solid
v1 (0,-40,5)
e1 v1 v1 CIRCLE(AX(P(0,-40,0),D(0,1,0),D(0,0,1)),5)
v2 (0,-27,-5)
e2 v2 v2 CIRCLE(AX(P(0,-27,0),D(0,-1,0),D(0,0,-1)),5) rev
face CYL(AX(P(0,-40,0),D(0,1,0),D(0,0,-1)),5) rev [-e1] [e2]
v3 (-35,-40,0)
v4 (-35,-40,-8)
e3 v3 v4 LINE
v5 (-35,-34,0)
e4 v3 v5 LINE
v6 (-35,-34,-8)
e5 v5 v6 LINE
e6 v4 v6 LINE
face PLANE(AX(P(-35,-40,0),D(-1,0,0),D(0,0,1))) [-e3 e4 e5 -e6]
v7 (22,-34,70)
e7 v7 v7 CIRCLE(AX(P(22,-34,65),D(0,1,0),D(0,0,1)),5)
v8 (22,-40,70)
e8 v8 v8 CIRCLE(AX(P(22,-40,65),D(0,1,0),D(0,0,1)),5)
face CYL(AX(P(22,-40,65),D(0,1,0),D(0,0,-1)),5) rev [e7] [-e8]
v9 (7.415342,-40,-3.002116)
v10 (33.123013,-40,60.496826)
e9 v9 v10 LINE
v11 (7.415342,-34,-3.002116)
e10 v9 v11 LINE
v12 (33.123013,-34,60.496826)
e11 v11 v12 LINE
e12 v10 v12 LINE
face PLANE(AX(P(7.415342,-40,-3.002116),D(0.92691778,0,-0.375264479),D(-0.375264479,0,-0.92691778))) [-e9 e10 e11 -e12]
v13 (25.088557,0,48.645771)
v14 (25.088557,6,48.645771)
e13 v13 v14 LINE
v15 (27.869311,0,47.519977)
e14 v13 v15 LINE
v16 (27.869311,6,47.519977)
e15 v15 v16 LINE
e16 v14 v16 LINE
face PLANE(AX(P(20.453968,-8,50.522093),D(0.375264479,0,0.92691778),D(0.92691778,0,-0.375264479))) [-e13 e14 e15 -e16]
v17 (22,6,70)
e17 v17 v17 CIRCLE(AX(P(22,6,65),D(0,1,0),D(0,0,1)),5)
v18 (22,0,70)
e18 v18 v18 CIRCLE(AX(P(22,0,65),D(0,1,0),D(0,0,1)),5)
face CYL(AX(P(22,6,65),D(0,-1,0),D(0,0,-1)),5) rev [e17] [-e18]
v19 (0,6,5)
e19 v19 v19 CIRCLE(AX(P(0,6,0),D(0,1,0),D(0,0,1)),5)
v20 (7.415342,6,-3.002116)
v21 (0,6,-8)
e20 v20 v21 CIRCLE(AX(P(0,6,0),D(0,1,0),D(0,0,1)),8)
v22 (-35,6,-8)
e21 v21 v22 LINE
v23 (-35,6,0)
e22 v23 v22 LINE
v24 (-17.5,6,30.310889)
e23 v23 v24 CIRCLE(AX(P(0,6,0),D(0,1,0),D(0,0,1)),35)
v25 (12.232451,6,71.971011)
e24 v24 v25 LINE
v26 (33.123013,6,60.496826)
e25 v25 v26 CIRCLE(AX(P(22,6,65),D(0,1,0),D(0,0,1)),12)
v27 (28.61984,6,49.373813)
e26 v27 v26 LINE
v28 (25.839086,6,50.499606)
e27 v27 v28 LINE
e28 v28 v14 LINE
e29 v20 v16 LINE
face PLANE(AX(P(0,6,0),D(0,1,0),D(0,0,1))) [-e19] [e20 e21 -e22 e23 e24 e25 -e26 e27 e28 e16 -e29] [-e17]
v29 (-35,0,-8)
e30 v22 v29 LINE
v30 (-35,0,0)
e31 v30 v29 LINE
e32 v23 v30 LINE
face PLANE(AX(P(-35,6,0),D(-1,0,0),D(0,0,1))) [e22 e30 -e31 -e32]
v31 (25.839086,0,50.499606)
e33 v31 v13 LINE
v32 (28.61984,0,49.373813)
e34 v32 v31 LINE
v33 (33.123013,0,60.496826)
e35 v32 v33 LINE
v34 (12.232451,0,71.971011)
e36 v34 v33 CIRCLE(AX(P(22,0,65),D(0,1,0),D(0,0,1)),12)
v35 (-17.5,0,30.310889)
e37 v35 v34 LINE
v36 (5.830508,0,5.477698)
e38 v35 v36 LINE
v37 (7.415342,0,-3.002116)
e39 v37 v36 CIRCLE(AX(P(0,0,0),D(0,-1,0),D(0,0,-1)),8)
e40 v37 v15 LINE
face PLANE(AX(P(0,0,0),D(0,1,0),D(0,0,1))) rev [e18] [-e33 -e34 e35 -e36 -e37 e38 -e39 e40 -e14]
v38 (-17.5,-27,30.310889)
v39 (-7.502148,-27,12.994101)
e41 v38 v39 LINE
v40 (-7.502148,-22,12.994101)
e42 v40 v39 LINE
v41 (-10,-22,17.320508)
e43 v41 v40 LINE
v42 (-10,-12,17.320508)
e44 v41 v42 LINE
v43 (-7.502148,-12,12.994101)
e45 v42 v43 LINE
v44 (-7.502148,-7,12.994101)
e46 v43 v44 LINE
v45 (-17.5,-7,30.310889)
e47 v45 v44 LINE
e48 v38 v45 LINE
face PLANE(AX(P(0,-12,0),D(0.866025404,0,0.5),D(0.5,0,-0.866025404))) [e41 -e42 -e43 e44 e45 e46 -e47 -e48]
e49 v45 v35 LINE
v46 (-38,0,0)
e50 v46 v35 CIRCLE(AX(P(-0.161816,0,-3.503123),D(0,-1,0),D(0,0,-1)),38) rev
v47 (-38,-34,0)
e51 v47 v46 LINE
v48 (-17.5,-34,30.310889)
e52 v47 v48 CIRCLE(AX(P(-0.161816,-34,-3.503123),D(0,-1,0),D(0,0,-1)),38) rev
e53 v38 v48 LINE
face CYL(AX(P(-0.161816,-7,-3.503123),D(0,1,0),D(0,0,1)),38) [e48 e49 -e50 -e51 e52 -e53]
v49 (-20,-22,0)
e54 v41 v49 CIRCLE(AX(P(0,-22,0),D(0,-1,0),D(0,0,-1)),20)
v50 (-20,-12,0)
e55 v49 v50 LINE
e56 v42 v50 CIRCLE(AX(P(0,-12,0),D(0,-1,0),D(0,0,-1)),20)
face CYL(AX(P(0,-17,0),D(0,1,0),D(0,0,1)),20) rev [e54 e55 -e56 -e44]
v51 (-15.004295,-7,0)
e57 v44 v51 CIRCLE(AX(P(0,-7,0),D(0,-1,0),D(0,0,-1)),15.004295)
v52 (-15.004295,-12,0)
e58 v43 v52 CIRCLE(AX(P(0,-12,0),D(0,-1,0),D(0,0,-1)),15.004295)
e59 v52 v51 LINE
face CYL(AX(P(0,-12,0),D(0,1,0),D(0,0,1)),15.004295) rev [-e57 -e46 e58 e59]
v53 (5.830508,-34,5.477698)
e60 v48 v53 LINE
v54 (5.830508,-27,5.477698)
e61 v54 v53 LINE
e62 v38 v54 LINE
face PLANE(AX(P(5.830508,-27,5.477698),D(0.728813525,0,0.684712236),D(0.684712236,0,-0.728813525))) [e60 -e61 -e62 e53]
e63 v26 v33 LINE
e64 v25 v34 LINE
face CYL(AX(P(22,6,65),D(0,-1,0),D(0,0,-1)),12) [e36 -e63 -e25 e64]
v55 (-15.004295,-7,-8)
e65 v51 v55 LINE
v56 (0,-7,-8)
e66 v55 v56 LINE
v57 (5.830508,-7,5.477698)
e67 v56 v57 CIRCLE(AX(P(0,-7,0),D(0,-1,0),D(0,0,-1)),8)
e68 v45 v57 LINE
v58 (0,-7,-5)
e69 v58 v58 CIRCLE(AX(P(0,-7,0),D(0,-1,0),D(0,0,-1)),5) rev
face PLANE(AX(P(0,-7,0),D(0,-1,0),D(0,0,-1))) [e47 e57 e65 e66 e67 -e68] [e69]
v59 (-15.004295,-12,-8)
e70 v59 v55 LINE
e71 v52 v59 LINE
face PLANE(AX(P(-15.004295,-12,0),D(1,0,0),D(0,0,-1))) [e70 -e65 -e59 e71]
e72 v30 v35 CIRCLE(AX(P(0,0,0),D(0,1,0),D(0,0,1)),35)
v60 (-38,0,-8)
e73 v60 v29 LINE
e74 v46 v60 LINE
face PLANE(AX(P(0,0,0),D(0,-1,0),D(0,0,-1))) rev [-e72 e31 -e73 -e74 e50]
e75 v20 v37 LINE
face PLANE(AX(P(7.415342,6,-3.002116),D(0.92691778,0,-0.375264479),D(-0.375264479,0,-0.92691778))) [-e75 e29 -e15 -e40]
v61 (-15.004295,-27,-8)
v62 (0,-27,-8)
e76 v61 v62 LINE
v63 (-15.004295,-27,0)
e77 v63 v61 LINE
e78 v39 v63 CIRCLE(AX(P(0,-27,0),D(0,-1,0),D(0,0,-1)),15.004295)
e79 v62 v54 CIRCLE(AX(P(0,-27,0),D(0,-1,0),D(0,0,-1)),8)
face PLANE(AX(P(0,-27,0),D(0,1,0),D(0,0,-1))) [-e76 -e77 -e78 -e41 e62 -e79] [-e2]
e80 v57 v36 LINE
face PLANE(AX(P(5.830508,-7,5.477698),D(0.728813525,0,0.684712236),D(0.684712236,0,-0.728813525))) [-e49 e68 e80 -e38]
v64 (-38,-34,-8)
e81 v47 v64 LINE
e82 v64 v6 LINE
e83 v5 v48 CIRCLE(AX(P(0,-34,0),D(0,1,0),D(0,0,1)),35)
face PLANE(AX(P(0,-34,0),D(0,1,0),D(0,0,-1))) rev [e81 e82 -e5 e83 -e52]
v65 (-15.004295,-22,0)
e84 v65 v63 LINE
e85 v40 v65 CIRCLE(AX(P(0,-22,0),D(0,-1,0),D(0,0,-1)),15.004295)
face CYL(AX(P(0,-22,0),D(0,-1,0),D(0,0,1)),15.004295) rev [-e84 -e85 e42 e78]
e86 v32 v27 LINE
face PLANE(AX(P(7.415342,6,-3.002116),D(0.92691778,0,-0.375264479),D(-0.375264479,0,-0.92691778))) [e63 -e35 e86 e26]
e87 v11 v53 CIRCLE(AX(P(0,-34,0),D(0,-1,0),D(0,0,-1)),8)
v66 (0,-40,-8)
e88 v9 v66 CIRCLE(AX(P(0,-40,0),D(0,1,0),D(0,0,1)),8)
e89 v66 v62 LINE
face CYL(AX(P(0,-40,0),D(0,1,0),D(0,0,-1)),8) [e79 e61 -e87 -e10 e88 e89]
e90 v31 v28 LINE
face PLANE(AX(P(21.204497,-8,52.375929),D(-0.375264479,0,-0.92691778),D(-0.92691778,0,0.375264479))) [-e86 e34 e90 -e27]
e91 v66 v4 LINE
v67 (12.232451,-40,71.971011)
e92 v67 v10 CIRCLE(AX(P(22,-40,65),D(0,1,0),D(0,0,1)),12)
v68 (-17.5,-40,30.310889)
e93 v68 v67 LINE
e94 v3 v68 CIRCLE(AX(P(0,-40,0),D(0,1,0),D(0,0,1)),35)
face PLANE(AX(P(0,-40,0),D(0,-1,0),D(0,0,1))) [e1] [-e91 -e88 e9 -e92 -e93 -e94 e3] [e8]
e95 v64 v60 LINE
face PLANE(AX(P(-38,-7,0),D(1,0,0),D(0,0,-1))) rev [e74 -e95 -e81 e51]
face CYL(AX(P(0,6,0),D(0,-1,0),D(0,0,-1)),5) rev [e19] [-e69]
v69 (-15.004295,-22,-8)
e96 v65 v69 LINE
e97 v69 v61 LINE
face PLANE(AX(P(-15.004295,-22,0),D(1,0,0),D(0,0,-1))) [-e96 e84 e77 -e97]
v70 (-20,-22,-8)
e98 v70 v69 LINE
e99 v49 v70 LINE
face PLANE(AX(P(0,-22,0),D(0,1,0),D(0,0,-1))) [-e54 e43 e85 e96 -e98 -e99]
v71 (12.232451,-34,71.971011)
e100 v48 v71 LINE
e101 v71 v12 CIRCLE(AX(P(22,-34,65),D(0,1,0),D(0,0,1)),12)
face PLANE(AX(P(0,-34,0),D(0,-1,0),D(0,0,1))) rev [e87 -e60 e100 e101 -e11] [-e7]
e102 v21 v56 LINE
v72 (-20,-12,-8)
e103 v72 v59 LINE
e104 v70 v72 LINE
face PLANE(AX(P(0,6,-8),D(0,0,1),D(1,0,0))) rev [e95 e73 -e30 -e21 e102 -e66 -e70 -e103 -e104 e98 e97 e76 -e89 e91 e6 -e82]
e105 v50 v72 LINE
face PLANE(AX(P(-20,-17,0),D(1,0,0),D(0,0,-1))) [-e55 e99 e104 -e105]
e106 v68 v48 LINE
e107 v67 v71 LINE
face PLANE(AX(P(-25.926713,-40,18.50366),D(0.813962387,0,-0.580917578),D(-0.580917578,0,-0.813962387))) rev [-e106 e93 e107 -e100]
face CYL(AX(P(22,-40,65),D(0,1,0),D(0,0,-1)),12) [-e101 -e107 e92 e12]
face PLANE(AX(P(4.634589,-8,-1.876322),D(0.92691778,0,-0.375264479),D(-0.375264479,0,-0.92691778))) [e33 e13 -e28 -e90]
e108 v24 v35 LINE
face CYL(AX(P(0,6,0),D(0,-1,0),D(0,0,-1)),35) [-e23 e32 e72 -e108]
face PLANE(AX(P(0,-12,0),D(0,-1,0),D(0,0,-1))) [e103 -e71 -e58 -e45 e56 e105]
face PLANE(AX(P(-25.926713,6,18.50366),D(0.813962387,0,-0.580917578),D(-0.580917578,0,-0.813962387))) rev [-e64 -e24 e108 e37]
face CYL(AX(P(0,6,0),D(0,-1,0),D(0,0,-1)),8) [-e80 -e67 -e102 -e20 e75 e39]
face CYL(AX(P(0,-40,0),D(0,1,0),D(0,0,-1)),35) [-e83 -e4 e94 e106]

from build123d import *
from build123d.topology import SkipClean

# Parameters (mm, degrees)
SKETCH2_R           = 5
BOSS_EXTRUDE1_DEPTH = 6
BOSS_EXTRUDE2_START = 7
SKETCH3_R           = 5
BOSS_EXTRUDE2_DEPTH = 7
BOSS_EXTRUDE3_START = 5
SKETCH4_W           = 22.995704609
SKETCH4_H           = 8
BOSS_EXTRUDE3_DEPTH = 5
BOSS_EXTRUDE4_START = 5
SKETCH5_W           = 18
SKETCH5_H           = 8
BOSS_EXTRUDE4_DEPTH = 5
MIRROR1_START       = -40
MIRROR1_OUTLINE_R   = 5
MIRROR1_DEPTH       = 6
MIRROR1_START_2     = -34
MIRROR1_2_DEPTH     = 17
MIRROR1_3_OUTLINE_R = 5
MIRROR1_3_DEPTH     = 7
MIRROR1_START_3     = -27
MIRROR1_4_DEPTH     = 5
CUT_EXTRUDE1_DEPTH  = 14


# Read off the part's stored shape, not the designer's step: Mirror1
with BuildPart() as part:
    # Sketch2 → Boss-Extrude1 (new body)
    with BuildSketch(Plane(origin=(0, 0, 0), x_dir=(1, 0, 0), z_dir=(0, 1, 0))):
        with BuildLine():
            ThreePointArc((7.415342239, 3.002115835), (4.471189625, 6.633887498), (0, 8))
            Line((0, 8), (-35, 8))
            Line((-35, 8), (-35, 0))
            ThreePointArc((-35, 0), (-30.310889132, -17.5), (-17.5, -30.310889132))
            Line((-17.5, -30.310889132), (12.232451358, -71.97101094))
            ThreePointArc((12.232451358, -71.97101094), (27.776984485, -75.517910927), (33.123013358, -60.496826248))
            Line((33.123013358, -60.496826248), (7.415342239, 3.002115835))
        make_face()
        with Locations(Location((0, 0, 0), (0, 0, 270))):
            Circle(SKETCH2_R, mode=Mode.SUBTRACT)
        with Locations(Location((22, -65, 0), (0, 0, 270))):
            Circle(SKETCH2_R, mode=Mode.SUBTRACT)
    extrude(amount=BOSS_EXTRUDE1_DEPTH)

    # Sketch3 → Boss-Extrude2 (add)
    with SkipClean():  # the faces are left unmerged after this step: merging them gives an invalid solid
        with BuildSketch(Plane.XZ.offset(BOSS_EXTRUDE2_START)):
            with BuildLine():
                Line((5.830508196, 5.47769789), (-17.5, 30.310889132))
                ThreePointArc((-17.5, 30.310889132), (-31.638718646, 17.785480653), (-38, 0))
                Line((-38, 0), (-38, -8))
                Line((-38, -8), (-35, -8))
                Line((-35, -8), (0, -8))
                ThreePointArc((0, -8), (7.342396854, -3.176351435), (5.830508196, 5.47769789))
            make_face()
            with Locations(Location((0, 0, 0), (0, 0, 270))):
                Circle(SKETCH3_R, mode=Mode.SUBTRACT)
        extrude(amount=-BOSS_EXTRUDE2_DEPTH)

    # Sketch4 → Boss-Extrude3 (add)
    with SkipClean():  # the faces are left unmerged after this step: merging them gives an invalid solid
        with BuildSketch(Plane.XZ.offset(7).offset(BOSS_EXTRUDE3_START)):
            with BuildLine():
                Line((-38, 0), (-15.004295391, 0))
                ThreePointArc((-15.004295391, 0), (-12.994100974, 7.502147695), (-7.502147695, 12.994100974))
                Line((-7.502147695, 12.994100974), (-17.5, 30.310889132))
                ThreePointArc((-17.5, 30.310889132), (-31.638718646, 17.785480653), (-38, 0))
            make_face()
            with Locations((-26.502147695, -4)):
                Rectangle(SKETCH4_W, SKETCH4_H)
        extrude(amount=-BOSS_EXTRUDE3_DEPTH)

    # Sketch5 → Boss-Extrude4 (add)
    with SkipClean():  # the faces are left unmerged after this step: merging them gives an invalid solid
        with BuildSketch(Plane.XZ.offset(12).offset(BOSS_EXTRUDE4_START)):
            with Locations((-29, -4)):
                Rectangle(SKETCH5_W, SKETCH5_H)
            with BuildLine():
                ThreePointArc((-20, 0), (-17.320508076, 10), (-10, 17.320508076))
                Line((-10, 17.320508076), (-17.5, 30.310889132))
                ThreePointArc((-17.5, 30.310889132), (-31.638718646, 17.785480653), (-38, 0))
                Line((-38, 0), (-20, 0))
            make_face()
        extrude(amount=-BOSS_EXTRUDE4_DEPTH)



with BuildPart() as body_2:
    # Mirror1 outline → Mirror1 (new body)
    with BuildSketch(Plane(origin=(0, 0, 0), x_dir=(1, 0, 0), z_dir=(0, 1, 0)).offset(MIRROR1_START)):
        with BuildLine():
            Line((0, 8), (-35, 8))
            Line((-35, 8), (-35, 0))
            ThreePointArc((-35, 0), (-30.310889132, -17.5), (-17.5, -30.310889132))
            Line((-17.5, -30.310889132), (12.232451358, -71.97101094))
            ThreePointArc((12.232451358, -71.97101094), (27.776984485, -75.517910927), (33.123013358, -60.496826248))
            Line((33.123013358, -60.496826248), (7.415342239, 3.002115835))
            ThreePointArc((7.415342239, 3.002115835), (4.471189625, 6.633887498), (0, 8))
        make_face()
        Circle(MIRROR1_OUTLINE_R, mode=Mode.SUBTRACT)
        with Locations((22, -65)):
            Circle(MIRROR1_OUTLINE_R, mode=Mode.SUBTRACT)
    extrude(amount=MIRROR1_DEPTH)


with BuildPart() as part_1:
    with SkipClean():  # the faces are left unmerged after this step: merging them gives an invalid solid
        add(part.part)

        add(body_2.part)  # Mirror1 2 merges body 2
        # Mirror1 2 outline → Mirror1 2 (add)
        with BuildSketch(Plane(origin=(0, 0, 0), x_dir=(1, 0, 0), z_dir=(0, 1, 0)).offset(MIRROR1_START_2)):
            with BuildLine():
                ThreePointArc((-38, 0), (-31.638718646, -17.785480653), (-17.5, -30.310889132))
                Line((-17.5, -30.310889132), (-10, -17.320508076))
                ThreePointArc((-10, -17.320508076), (-17.320508076, -10), (-20, 0))
                Line((-20, 0), (-20, 8))
                Line((-20, 8), (-38, 8))
                Line((-38, 8), (-38, 0))
            make_face()
        extrude(amount=MIRROR1_2_DEPTH)

    # Mirror1 3 outline → Mirror1 3 (add)
    with SkipClean():  # the faces are left unmerged after this step: merging them gives an invalid solid
        with BuildSketch(Plane(origin=(0, 0, 0), x_dir=(1, 0, 0), z_dir=(0, 1, 0)).offset(MIRROR1_START_2)):
            with BuildLine():
                Line((-17.5, -30.310889132), (5.830508196, -5.47769789))
                ThreePointArc((5.830508196, -5.47769789), (7.342396854, 3.176351435), (0, 8))
                Line((0, 8), (-20, 8))
                Line((-20, 8), (-20, 0))
                ThreePointArc((-20, 0), (-17.320508076, -10), (-10, -17.320508076))
                Line((-10, -17.320508076), (-17.5, -30.310889132))
            make_face()
            Circle(MIRROR1_3_OUTLINE_R, mode=Mode.SUBTRACT)
        extrude(amount=MIRROR1_3_DEPTH)

    # Mirror1 4 outline → Mirror1 4 (add)
    with SkipClean():  # the faces are left unmerged after this step: merging them gives an invalid solid
        with BuildSketch(Plane(origin=(0, 0, 0), x_dir=(1, 0, 0), z_dir=(0, 1, 0)).offset(MIRROR1_START_3)):
            with BuildLine():
                ThreePointArc((-20, 0), (-17.320508076, -10), (-10, -17.320508076))
                Line((-10, -17.320508076), (-7.502147695, -12.994100974))
                ThreePointArc((-7.502147695, -12.994100974), (-12.994100974, -7.502147695), (-15.004295391, 0))
                Line((-15.004295391, 0), (-15.004295391, 8))
                Line((-15.004295391, 8), (-20, 8))
                Line((-20, 8), (-20, 0))
            make_face()
        extrude(amount=MIRROR1_4_DEPTH)

    # Sketch6 → Cut-Extrude1 (cut)
    with SkipClean():  # the faces are left unmerged after this step: merging them gives an invalid solid
        with BuildSketch(Plane(origin=(0, 6, 0), x_dir=(1, 0, 0), z_dir=(0, 1, 0))):
            Polygon((25.839086267, -50.499606328), (28.619839606, -49.37381289), (27.869310647, -47.519977331), (25.088557308, -48.645770769), align=None)
        extrude(amount=-CUT_EXTRUDE1_DEPTH, mode=Mode.SUBTRACT)


solid = part_1.part
